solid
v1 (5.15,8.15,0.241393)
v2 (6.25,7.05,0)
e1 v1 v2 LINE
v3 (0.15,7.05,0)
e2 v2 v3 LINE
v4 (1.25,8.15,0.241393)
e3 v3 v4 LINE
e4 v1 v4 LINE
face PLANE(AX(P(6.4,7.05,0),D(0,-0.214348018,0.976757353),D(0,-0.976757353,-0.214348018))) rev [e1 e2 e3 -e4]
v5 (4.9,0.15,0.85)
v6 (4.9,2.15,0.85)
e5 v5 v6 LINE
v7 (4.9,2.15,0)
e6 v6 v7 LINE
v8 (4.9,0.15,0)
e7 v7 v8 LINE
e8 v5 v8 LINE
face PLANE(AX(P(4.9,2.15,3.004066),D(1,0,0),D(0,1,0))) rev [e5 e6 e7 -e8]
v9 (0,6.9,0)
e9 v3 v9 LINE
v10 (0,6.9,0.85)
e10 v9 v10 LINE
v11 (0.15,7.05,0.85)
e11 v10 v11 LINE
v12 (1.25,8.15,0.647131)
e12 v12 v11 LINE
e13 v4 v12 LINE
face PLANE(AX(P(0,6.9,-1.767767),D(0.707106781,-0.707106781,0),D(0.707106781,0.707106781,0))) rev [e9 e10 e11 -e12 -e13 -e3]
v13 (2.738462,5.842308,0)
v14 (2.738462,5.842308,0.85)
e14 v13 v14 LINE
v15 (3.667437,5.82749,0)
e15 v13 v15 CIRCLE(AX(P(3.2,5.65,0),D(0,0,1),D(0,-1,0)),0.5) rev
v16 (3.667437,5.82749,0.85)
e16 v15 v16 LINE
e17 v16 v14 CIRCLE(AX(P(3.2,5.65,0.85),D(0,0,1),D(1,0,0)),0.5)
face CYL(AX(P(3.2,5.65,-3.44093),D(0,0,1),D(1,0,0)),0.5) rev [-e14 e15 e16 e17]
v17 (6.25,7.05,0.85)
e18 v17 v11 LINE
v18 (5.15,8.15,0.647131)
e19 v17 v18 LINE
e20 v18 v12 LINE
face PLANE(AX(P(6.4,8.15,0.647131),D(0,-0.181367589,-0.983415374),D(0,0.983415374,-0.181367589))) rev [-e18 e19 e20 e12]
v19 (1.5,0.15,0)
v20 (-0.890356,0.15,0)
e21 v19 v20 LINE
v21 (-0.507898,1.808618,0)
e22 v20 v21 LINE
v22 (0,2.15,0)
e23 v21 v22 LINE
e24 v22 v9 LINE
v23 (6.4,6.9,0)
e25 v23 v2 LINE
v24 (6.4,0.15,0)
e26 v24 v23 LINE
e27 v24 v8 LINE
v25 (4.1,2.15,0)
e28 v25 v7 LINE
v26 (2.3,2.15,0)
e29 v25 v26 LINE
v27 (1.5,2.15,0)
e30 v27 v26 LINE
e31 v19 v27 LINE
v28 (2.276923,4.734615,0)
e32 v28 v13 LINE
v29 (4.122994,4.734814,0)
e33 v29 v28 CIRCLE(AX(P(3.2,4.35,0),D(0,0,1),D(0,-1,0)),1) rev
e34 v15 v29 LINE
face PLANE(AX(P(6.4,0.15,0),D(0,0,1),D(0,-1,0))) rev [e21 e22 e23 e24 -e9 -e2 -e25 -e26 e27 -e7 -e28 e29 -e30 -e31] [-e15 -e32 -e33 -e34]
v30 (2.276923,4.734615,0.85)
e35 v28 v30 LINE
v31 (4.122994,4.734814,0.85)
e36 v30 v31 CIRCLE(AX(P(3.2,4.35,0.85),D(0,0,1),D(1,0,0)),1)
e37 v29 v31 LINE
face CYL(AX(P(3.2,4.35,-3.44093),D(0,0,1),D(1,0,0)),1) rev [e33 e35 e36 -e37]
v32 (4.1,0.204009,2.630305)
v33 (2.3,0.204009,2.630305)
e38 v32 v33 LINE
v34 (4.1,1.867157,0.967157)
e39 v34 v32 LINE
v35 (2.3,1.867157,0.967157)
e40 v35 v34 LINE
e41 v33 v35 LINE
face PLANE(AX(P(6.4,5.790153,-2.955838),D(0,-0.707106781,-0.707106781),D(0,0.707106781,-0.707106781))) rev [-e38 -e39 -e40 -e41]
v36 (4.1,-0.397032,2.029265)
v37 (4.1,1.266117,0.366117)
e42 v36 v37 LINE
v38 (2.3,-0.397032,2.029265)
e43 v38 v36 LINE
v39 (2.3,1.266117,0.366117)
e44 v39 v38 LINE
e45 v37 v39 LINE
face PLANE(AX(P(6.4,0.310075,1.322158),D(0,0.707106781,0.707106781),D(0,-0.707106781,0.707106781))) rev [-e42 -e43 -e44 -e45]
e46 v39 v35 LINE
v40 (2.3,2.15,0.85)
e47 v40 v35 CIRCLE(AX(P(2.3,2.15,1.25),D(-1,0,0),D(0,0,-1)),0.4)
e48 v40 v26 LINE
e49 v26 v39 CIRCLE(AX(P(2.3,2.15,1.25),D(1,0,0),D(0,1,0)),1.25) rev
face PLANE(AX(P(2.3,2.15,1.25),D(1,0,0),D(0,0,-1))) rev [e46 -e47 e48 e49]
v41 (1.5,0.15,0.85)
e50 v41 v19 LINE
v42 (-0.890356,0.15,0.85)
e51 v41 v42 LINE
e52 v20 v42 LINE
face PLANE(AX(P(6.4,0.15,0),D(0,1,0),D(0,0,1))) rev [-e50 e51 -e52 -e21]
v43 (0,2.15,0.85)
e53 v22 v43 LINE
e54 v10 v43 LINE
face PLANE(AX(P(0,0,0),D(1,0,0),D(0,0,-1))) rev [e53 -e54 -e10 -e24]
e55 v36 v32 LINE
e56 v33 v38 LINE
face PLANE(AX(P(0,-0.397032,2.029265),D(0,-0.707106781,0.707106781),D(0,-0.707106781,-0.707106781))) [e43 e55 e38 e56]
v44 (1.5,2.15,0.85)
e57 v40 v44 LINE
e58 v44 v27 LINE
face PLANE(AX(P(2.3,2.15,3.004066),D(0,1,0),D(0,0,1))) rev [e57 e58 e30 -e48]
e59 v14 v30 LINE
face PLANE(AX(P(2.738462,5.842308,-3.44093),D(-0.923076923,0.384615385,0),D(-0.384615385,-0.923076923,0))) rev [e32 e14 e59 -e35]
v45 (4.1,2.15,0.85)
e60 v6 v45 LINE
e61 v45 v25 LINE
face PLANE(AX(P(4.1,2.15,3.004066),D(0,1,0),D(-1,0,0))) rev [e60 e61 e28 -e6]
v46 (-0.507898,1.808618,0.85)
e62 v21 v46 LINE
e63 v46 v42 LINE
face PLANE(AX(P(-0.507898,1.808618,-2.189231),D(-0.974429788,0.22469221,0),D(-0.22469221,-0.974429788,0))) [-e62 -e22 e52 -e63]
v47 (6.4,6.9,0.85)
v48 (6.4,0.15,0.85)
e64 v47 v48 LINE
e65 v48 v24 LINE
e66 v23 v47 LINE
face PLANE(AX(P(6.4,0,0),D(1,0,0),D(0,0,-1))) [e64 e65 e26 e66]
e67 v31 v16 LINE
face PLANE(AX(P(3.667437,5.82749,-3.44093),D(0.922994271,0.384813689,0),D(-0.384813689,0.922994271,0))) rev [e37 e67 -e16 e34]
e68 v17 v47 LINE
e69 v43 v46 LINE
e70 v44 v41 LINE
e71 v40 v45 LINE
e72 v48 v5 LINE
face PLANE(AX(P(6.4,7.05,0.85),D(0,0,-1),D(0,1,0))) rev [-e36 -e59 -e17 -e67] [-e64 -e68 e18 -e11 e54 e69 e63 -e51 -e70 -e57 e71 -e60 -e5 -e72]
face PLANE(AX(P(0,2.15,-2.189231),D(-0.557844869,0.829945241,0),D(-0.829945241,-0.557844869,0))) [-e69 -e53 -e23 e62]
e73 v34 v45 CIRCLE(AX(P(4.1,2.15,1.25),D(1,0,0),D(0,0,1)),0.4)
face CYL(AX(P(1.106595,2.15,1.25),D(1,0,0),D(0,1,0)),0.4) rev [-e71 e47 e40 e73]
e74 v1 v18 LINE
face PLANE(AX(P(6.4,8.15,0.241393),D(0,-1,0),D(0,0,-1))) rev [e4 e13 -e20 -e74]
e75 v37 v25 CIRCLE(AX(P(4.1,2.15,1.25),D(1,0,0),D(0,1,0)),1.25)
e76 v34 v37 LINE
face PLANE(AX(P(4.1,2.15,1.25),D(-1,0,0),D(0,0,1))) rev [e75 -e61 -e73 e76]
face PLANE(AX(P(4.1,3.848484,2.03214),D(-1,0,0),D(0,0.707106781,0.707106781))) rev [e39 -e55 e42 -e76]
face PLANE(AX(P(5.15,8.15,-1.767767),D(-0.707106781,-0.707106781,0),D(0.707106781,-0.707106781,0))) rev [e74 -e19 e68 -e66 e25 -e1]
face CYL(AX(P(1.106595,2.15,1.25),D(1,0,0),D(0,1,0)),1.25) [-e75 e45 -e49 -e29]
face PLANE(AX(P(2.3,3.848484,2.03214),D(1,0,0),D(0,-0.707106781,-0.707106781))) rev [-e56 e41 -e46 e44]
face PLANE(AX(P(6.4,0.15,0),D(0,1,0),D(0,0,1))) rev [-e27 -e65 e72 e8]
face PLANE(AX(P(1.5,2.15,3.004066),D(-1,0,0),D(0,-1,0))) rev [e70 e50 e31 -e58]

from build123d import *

# Parameters (mm, degrees)
BOSS_EXTRUDE1_DEPTH    = 6.4
CUT_EXTRUDE1_REACH     = 12.397
CUT_EXTRUDE2_DEPTH     = 0.85
SKETCH6_W              = 0.8
SKETCH6_H              = 2
CUT_EXTRUDE3_DEPTH     = 0.85
SKETCH7_W              = 1.8
SKETCH7_H              = 0.85
BOSS_EXTRUDE2_DEPTH    = 1
SKETCHED_START         = 2.3
SKETCHED_BEND1_DEPTH   = 1.8
SKETCHED_BEND1_2_DEPTH = 1.8
BOSS_EXTRUDE3_DEPTH    = 0.85


# Read off the part's stored shape, not the designer's step: Sketched Bend1
with BuildPart() as part:
    # Sketch1 → Boss-Extrude1 (new body)
    with BuildSketch(Plane(origin=(0, 0, 0), x_dir=(0, 0, -1), z_dir=(1, 0, 0))):
        Polygon((0, 0.15), (0, 7.05), (-0.241393443, 8.15), (-0.647131148, 8.15), (-0.85, 7.05), (-0.85, 0.15), align=None)
    extrude(amount=BOSS_EXTRUDE1_DEPTH)

    # Cut-Extrude1: up to this face of the body (flat: up to its plane)
    cut_extrude1_end = Plane(part.part.faces().sort_by_distance((3.2, 3.6, 0))[0])
    # Sketch4 → Cut-Extrude1 (cut, up to the picked face)
    with BuildSketch(Plane.XY.offset(0.85), mode=Mode.PRIVATE) as cut_extrude1_sk1:
        Polygon((0, 6.9), (1.25, 8.15), (0, 8.15), align=None)
    cut_extrude1_tool1 = split(extrude(cut_extrude1_sk1.sketch, amount=-CUT_EXTRUDE1_REACH, mode=Mode.PRIVATE), bisect_by=cut_extrude1_end, keep=Keep.BOTH, mode=Mode.PRIVATE)
    # Sketch4 → Cut-Extrude1 (cut, up to the picked face)
    with BuildSketch(Plane.XY.offset(0.85), mode=Mode.PRIVATE) as cut_extrude1_sk2:
        Polygon((5.15, 8.15), (6.4, 6.9), (6.4, 8.15), align=None)
    cut_extrude1_tool2 = split(extrude(cut_extrude1_sk2.sketch, amount=-CUT_EXTRUDE1_REACH, mode=Mode.PRIVATE), bisect_by=cut_extrude1_end, keep=Keep.BOTH, mode=Mode.PRIVATE)
    add(cut_extrude1_tool1.solids().sort_by(Axis((0.416667, 7.733333, 0.85), (0, 0, -1)))[0], mode=Mode.SUBTRACT)
    add(cut_extrude1_tool2.solids().sort_by(Axis((5.983333, 7.733333, 0.85), (0, 0, -1)))[0], mode=Mode.SUBTRACT)

    # Sketch5 → Cut-Extrude2 (cut)
    with BuildSketch(Plane.XY.offset(0.85)):
        with BuildLine():
            Line((2.738461538, 5.842307692), (2.276923077, 4.734615385))
            ThreePointArc((2.276923077, 4.734615385), (3.20010742, 3.350000006), (4.122994271, 4.734813689))
            Line((4.122994271, 4.734813689), (3.667436975, 5.827489929))
            ThreePointArc((3.667436975, 5.827489929), (3.207974312, 6.149936406), (2.738461538, 5.842307692))
        make_face()
    extrude(amount=-CUT_EXTRUDE2_DEPTH, mode=Mode.SUBTRACT)

    # Sketch6 → Cut-Extrude3 (cut)
    with BuildSketch(Plane(origin=(0, 0, 0), x_dir=(-1, 0, 0), z_dir=(0, 0, -1))):
        with Locations((-4.5, 1.15)):
            Rectangle(SKETCH6_W, SKETCH6_H)
        with Locations((-1.9, 1.15)):
            Rectangle(SKETCH6_W, SKETCH6_H)
    extrude(amount=-CUT_EXTRUDE3_DEPTH, mode=Mode.SUBTRACT)

    # Sketch7 → Boss-Extrude2 (add)
    with BuildSketch(Plane.XZ.offset(-0.15)):
        with Locations((3.2, 0.425)):
            Rectangle(SKETCH7_W, SKETCH7_H)
    extrude(amount=BOSS_EXTRUDE2_DEPTH)

    # Sketched Bend1 outline → Sketched Bend1 (cut)
    with BuildSketch(Plane.YZ.offset(SKETCHED_START)):
        with BuildLine():
            Line((1.266116524, 0.366116524), (0.782233048, 0.85))
            Line((0.782233048, 0.85), (-0.85, 0.85))
            Line((-0.85, 0.85), (-0.85, 0))
            Line((-0.85, 0), (2.15, 0))
            ThreePointArc((2.15, 0), (1.67164571, 0.095150584), (1.266116524, 0.366116524))
        make_face()
    extrude(amount=SKETCHED_BEND1_DEPTH, mode=Mode.SUBTRACT)

    # Sketched Bend1 2 outline → Sketched Bend1 2 (add)
    with BuildSketch(Plane.YZ.offset(SKETCHED_START)):
        with BuildLine():
            ThreePointArc((2.15, 0.85), (1.996926627, 0.880448187), (1.867157288, 0.967157288))
            Line((1.867157288, 0.967157288), (0.204009247, 2.630305328))
            Line((0.204009247, 2.630305328), (-0.397031517, 2.029264564))
            Line((-0.397031517, 2.029264564), (0.782233048, 0.85))
            Line((0.782233048, 0.85), (2.15, 0.85))
        make_face()
    extrude(amount=SKETCHED_BEND1_2_DEPTH)

    # Sketch15 → Boss-Extrude3 (add)
    with BuildSketch(Plane.XY.offset(0.85)):
        Polygon((0, 2.15), (-0.50789834, 1.808617859), (-0.890356386, 0.15), (0, 0.15), align=None)
    extrude(amount=-BOSS_EXTRUDE3_DEPTH)


solid = part.part
